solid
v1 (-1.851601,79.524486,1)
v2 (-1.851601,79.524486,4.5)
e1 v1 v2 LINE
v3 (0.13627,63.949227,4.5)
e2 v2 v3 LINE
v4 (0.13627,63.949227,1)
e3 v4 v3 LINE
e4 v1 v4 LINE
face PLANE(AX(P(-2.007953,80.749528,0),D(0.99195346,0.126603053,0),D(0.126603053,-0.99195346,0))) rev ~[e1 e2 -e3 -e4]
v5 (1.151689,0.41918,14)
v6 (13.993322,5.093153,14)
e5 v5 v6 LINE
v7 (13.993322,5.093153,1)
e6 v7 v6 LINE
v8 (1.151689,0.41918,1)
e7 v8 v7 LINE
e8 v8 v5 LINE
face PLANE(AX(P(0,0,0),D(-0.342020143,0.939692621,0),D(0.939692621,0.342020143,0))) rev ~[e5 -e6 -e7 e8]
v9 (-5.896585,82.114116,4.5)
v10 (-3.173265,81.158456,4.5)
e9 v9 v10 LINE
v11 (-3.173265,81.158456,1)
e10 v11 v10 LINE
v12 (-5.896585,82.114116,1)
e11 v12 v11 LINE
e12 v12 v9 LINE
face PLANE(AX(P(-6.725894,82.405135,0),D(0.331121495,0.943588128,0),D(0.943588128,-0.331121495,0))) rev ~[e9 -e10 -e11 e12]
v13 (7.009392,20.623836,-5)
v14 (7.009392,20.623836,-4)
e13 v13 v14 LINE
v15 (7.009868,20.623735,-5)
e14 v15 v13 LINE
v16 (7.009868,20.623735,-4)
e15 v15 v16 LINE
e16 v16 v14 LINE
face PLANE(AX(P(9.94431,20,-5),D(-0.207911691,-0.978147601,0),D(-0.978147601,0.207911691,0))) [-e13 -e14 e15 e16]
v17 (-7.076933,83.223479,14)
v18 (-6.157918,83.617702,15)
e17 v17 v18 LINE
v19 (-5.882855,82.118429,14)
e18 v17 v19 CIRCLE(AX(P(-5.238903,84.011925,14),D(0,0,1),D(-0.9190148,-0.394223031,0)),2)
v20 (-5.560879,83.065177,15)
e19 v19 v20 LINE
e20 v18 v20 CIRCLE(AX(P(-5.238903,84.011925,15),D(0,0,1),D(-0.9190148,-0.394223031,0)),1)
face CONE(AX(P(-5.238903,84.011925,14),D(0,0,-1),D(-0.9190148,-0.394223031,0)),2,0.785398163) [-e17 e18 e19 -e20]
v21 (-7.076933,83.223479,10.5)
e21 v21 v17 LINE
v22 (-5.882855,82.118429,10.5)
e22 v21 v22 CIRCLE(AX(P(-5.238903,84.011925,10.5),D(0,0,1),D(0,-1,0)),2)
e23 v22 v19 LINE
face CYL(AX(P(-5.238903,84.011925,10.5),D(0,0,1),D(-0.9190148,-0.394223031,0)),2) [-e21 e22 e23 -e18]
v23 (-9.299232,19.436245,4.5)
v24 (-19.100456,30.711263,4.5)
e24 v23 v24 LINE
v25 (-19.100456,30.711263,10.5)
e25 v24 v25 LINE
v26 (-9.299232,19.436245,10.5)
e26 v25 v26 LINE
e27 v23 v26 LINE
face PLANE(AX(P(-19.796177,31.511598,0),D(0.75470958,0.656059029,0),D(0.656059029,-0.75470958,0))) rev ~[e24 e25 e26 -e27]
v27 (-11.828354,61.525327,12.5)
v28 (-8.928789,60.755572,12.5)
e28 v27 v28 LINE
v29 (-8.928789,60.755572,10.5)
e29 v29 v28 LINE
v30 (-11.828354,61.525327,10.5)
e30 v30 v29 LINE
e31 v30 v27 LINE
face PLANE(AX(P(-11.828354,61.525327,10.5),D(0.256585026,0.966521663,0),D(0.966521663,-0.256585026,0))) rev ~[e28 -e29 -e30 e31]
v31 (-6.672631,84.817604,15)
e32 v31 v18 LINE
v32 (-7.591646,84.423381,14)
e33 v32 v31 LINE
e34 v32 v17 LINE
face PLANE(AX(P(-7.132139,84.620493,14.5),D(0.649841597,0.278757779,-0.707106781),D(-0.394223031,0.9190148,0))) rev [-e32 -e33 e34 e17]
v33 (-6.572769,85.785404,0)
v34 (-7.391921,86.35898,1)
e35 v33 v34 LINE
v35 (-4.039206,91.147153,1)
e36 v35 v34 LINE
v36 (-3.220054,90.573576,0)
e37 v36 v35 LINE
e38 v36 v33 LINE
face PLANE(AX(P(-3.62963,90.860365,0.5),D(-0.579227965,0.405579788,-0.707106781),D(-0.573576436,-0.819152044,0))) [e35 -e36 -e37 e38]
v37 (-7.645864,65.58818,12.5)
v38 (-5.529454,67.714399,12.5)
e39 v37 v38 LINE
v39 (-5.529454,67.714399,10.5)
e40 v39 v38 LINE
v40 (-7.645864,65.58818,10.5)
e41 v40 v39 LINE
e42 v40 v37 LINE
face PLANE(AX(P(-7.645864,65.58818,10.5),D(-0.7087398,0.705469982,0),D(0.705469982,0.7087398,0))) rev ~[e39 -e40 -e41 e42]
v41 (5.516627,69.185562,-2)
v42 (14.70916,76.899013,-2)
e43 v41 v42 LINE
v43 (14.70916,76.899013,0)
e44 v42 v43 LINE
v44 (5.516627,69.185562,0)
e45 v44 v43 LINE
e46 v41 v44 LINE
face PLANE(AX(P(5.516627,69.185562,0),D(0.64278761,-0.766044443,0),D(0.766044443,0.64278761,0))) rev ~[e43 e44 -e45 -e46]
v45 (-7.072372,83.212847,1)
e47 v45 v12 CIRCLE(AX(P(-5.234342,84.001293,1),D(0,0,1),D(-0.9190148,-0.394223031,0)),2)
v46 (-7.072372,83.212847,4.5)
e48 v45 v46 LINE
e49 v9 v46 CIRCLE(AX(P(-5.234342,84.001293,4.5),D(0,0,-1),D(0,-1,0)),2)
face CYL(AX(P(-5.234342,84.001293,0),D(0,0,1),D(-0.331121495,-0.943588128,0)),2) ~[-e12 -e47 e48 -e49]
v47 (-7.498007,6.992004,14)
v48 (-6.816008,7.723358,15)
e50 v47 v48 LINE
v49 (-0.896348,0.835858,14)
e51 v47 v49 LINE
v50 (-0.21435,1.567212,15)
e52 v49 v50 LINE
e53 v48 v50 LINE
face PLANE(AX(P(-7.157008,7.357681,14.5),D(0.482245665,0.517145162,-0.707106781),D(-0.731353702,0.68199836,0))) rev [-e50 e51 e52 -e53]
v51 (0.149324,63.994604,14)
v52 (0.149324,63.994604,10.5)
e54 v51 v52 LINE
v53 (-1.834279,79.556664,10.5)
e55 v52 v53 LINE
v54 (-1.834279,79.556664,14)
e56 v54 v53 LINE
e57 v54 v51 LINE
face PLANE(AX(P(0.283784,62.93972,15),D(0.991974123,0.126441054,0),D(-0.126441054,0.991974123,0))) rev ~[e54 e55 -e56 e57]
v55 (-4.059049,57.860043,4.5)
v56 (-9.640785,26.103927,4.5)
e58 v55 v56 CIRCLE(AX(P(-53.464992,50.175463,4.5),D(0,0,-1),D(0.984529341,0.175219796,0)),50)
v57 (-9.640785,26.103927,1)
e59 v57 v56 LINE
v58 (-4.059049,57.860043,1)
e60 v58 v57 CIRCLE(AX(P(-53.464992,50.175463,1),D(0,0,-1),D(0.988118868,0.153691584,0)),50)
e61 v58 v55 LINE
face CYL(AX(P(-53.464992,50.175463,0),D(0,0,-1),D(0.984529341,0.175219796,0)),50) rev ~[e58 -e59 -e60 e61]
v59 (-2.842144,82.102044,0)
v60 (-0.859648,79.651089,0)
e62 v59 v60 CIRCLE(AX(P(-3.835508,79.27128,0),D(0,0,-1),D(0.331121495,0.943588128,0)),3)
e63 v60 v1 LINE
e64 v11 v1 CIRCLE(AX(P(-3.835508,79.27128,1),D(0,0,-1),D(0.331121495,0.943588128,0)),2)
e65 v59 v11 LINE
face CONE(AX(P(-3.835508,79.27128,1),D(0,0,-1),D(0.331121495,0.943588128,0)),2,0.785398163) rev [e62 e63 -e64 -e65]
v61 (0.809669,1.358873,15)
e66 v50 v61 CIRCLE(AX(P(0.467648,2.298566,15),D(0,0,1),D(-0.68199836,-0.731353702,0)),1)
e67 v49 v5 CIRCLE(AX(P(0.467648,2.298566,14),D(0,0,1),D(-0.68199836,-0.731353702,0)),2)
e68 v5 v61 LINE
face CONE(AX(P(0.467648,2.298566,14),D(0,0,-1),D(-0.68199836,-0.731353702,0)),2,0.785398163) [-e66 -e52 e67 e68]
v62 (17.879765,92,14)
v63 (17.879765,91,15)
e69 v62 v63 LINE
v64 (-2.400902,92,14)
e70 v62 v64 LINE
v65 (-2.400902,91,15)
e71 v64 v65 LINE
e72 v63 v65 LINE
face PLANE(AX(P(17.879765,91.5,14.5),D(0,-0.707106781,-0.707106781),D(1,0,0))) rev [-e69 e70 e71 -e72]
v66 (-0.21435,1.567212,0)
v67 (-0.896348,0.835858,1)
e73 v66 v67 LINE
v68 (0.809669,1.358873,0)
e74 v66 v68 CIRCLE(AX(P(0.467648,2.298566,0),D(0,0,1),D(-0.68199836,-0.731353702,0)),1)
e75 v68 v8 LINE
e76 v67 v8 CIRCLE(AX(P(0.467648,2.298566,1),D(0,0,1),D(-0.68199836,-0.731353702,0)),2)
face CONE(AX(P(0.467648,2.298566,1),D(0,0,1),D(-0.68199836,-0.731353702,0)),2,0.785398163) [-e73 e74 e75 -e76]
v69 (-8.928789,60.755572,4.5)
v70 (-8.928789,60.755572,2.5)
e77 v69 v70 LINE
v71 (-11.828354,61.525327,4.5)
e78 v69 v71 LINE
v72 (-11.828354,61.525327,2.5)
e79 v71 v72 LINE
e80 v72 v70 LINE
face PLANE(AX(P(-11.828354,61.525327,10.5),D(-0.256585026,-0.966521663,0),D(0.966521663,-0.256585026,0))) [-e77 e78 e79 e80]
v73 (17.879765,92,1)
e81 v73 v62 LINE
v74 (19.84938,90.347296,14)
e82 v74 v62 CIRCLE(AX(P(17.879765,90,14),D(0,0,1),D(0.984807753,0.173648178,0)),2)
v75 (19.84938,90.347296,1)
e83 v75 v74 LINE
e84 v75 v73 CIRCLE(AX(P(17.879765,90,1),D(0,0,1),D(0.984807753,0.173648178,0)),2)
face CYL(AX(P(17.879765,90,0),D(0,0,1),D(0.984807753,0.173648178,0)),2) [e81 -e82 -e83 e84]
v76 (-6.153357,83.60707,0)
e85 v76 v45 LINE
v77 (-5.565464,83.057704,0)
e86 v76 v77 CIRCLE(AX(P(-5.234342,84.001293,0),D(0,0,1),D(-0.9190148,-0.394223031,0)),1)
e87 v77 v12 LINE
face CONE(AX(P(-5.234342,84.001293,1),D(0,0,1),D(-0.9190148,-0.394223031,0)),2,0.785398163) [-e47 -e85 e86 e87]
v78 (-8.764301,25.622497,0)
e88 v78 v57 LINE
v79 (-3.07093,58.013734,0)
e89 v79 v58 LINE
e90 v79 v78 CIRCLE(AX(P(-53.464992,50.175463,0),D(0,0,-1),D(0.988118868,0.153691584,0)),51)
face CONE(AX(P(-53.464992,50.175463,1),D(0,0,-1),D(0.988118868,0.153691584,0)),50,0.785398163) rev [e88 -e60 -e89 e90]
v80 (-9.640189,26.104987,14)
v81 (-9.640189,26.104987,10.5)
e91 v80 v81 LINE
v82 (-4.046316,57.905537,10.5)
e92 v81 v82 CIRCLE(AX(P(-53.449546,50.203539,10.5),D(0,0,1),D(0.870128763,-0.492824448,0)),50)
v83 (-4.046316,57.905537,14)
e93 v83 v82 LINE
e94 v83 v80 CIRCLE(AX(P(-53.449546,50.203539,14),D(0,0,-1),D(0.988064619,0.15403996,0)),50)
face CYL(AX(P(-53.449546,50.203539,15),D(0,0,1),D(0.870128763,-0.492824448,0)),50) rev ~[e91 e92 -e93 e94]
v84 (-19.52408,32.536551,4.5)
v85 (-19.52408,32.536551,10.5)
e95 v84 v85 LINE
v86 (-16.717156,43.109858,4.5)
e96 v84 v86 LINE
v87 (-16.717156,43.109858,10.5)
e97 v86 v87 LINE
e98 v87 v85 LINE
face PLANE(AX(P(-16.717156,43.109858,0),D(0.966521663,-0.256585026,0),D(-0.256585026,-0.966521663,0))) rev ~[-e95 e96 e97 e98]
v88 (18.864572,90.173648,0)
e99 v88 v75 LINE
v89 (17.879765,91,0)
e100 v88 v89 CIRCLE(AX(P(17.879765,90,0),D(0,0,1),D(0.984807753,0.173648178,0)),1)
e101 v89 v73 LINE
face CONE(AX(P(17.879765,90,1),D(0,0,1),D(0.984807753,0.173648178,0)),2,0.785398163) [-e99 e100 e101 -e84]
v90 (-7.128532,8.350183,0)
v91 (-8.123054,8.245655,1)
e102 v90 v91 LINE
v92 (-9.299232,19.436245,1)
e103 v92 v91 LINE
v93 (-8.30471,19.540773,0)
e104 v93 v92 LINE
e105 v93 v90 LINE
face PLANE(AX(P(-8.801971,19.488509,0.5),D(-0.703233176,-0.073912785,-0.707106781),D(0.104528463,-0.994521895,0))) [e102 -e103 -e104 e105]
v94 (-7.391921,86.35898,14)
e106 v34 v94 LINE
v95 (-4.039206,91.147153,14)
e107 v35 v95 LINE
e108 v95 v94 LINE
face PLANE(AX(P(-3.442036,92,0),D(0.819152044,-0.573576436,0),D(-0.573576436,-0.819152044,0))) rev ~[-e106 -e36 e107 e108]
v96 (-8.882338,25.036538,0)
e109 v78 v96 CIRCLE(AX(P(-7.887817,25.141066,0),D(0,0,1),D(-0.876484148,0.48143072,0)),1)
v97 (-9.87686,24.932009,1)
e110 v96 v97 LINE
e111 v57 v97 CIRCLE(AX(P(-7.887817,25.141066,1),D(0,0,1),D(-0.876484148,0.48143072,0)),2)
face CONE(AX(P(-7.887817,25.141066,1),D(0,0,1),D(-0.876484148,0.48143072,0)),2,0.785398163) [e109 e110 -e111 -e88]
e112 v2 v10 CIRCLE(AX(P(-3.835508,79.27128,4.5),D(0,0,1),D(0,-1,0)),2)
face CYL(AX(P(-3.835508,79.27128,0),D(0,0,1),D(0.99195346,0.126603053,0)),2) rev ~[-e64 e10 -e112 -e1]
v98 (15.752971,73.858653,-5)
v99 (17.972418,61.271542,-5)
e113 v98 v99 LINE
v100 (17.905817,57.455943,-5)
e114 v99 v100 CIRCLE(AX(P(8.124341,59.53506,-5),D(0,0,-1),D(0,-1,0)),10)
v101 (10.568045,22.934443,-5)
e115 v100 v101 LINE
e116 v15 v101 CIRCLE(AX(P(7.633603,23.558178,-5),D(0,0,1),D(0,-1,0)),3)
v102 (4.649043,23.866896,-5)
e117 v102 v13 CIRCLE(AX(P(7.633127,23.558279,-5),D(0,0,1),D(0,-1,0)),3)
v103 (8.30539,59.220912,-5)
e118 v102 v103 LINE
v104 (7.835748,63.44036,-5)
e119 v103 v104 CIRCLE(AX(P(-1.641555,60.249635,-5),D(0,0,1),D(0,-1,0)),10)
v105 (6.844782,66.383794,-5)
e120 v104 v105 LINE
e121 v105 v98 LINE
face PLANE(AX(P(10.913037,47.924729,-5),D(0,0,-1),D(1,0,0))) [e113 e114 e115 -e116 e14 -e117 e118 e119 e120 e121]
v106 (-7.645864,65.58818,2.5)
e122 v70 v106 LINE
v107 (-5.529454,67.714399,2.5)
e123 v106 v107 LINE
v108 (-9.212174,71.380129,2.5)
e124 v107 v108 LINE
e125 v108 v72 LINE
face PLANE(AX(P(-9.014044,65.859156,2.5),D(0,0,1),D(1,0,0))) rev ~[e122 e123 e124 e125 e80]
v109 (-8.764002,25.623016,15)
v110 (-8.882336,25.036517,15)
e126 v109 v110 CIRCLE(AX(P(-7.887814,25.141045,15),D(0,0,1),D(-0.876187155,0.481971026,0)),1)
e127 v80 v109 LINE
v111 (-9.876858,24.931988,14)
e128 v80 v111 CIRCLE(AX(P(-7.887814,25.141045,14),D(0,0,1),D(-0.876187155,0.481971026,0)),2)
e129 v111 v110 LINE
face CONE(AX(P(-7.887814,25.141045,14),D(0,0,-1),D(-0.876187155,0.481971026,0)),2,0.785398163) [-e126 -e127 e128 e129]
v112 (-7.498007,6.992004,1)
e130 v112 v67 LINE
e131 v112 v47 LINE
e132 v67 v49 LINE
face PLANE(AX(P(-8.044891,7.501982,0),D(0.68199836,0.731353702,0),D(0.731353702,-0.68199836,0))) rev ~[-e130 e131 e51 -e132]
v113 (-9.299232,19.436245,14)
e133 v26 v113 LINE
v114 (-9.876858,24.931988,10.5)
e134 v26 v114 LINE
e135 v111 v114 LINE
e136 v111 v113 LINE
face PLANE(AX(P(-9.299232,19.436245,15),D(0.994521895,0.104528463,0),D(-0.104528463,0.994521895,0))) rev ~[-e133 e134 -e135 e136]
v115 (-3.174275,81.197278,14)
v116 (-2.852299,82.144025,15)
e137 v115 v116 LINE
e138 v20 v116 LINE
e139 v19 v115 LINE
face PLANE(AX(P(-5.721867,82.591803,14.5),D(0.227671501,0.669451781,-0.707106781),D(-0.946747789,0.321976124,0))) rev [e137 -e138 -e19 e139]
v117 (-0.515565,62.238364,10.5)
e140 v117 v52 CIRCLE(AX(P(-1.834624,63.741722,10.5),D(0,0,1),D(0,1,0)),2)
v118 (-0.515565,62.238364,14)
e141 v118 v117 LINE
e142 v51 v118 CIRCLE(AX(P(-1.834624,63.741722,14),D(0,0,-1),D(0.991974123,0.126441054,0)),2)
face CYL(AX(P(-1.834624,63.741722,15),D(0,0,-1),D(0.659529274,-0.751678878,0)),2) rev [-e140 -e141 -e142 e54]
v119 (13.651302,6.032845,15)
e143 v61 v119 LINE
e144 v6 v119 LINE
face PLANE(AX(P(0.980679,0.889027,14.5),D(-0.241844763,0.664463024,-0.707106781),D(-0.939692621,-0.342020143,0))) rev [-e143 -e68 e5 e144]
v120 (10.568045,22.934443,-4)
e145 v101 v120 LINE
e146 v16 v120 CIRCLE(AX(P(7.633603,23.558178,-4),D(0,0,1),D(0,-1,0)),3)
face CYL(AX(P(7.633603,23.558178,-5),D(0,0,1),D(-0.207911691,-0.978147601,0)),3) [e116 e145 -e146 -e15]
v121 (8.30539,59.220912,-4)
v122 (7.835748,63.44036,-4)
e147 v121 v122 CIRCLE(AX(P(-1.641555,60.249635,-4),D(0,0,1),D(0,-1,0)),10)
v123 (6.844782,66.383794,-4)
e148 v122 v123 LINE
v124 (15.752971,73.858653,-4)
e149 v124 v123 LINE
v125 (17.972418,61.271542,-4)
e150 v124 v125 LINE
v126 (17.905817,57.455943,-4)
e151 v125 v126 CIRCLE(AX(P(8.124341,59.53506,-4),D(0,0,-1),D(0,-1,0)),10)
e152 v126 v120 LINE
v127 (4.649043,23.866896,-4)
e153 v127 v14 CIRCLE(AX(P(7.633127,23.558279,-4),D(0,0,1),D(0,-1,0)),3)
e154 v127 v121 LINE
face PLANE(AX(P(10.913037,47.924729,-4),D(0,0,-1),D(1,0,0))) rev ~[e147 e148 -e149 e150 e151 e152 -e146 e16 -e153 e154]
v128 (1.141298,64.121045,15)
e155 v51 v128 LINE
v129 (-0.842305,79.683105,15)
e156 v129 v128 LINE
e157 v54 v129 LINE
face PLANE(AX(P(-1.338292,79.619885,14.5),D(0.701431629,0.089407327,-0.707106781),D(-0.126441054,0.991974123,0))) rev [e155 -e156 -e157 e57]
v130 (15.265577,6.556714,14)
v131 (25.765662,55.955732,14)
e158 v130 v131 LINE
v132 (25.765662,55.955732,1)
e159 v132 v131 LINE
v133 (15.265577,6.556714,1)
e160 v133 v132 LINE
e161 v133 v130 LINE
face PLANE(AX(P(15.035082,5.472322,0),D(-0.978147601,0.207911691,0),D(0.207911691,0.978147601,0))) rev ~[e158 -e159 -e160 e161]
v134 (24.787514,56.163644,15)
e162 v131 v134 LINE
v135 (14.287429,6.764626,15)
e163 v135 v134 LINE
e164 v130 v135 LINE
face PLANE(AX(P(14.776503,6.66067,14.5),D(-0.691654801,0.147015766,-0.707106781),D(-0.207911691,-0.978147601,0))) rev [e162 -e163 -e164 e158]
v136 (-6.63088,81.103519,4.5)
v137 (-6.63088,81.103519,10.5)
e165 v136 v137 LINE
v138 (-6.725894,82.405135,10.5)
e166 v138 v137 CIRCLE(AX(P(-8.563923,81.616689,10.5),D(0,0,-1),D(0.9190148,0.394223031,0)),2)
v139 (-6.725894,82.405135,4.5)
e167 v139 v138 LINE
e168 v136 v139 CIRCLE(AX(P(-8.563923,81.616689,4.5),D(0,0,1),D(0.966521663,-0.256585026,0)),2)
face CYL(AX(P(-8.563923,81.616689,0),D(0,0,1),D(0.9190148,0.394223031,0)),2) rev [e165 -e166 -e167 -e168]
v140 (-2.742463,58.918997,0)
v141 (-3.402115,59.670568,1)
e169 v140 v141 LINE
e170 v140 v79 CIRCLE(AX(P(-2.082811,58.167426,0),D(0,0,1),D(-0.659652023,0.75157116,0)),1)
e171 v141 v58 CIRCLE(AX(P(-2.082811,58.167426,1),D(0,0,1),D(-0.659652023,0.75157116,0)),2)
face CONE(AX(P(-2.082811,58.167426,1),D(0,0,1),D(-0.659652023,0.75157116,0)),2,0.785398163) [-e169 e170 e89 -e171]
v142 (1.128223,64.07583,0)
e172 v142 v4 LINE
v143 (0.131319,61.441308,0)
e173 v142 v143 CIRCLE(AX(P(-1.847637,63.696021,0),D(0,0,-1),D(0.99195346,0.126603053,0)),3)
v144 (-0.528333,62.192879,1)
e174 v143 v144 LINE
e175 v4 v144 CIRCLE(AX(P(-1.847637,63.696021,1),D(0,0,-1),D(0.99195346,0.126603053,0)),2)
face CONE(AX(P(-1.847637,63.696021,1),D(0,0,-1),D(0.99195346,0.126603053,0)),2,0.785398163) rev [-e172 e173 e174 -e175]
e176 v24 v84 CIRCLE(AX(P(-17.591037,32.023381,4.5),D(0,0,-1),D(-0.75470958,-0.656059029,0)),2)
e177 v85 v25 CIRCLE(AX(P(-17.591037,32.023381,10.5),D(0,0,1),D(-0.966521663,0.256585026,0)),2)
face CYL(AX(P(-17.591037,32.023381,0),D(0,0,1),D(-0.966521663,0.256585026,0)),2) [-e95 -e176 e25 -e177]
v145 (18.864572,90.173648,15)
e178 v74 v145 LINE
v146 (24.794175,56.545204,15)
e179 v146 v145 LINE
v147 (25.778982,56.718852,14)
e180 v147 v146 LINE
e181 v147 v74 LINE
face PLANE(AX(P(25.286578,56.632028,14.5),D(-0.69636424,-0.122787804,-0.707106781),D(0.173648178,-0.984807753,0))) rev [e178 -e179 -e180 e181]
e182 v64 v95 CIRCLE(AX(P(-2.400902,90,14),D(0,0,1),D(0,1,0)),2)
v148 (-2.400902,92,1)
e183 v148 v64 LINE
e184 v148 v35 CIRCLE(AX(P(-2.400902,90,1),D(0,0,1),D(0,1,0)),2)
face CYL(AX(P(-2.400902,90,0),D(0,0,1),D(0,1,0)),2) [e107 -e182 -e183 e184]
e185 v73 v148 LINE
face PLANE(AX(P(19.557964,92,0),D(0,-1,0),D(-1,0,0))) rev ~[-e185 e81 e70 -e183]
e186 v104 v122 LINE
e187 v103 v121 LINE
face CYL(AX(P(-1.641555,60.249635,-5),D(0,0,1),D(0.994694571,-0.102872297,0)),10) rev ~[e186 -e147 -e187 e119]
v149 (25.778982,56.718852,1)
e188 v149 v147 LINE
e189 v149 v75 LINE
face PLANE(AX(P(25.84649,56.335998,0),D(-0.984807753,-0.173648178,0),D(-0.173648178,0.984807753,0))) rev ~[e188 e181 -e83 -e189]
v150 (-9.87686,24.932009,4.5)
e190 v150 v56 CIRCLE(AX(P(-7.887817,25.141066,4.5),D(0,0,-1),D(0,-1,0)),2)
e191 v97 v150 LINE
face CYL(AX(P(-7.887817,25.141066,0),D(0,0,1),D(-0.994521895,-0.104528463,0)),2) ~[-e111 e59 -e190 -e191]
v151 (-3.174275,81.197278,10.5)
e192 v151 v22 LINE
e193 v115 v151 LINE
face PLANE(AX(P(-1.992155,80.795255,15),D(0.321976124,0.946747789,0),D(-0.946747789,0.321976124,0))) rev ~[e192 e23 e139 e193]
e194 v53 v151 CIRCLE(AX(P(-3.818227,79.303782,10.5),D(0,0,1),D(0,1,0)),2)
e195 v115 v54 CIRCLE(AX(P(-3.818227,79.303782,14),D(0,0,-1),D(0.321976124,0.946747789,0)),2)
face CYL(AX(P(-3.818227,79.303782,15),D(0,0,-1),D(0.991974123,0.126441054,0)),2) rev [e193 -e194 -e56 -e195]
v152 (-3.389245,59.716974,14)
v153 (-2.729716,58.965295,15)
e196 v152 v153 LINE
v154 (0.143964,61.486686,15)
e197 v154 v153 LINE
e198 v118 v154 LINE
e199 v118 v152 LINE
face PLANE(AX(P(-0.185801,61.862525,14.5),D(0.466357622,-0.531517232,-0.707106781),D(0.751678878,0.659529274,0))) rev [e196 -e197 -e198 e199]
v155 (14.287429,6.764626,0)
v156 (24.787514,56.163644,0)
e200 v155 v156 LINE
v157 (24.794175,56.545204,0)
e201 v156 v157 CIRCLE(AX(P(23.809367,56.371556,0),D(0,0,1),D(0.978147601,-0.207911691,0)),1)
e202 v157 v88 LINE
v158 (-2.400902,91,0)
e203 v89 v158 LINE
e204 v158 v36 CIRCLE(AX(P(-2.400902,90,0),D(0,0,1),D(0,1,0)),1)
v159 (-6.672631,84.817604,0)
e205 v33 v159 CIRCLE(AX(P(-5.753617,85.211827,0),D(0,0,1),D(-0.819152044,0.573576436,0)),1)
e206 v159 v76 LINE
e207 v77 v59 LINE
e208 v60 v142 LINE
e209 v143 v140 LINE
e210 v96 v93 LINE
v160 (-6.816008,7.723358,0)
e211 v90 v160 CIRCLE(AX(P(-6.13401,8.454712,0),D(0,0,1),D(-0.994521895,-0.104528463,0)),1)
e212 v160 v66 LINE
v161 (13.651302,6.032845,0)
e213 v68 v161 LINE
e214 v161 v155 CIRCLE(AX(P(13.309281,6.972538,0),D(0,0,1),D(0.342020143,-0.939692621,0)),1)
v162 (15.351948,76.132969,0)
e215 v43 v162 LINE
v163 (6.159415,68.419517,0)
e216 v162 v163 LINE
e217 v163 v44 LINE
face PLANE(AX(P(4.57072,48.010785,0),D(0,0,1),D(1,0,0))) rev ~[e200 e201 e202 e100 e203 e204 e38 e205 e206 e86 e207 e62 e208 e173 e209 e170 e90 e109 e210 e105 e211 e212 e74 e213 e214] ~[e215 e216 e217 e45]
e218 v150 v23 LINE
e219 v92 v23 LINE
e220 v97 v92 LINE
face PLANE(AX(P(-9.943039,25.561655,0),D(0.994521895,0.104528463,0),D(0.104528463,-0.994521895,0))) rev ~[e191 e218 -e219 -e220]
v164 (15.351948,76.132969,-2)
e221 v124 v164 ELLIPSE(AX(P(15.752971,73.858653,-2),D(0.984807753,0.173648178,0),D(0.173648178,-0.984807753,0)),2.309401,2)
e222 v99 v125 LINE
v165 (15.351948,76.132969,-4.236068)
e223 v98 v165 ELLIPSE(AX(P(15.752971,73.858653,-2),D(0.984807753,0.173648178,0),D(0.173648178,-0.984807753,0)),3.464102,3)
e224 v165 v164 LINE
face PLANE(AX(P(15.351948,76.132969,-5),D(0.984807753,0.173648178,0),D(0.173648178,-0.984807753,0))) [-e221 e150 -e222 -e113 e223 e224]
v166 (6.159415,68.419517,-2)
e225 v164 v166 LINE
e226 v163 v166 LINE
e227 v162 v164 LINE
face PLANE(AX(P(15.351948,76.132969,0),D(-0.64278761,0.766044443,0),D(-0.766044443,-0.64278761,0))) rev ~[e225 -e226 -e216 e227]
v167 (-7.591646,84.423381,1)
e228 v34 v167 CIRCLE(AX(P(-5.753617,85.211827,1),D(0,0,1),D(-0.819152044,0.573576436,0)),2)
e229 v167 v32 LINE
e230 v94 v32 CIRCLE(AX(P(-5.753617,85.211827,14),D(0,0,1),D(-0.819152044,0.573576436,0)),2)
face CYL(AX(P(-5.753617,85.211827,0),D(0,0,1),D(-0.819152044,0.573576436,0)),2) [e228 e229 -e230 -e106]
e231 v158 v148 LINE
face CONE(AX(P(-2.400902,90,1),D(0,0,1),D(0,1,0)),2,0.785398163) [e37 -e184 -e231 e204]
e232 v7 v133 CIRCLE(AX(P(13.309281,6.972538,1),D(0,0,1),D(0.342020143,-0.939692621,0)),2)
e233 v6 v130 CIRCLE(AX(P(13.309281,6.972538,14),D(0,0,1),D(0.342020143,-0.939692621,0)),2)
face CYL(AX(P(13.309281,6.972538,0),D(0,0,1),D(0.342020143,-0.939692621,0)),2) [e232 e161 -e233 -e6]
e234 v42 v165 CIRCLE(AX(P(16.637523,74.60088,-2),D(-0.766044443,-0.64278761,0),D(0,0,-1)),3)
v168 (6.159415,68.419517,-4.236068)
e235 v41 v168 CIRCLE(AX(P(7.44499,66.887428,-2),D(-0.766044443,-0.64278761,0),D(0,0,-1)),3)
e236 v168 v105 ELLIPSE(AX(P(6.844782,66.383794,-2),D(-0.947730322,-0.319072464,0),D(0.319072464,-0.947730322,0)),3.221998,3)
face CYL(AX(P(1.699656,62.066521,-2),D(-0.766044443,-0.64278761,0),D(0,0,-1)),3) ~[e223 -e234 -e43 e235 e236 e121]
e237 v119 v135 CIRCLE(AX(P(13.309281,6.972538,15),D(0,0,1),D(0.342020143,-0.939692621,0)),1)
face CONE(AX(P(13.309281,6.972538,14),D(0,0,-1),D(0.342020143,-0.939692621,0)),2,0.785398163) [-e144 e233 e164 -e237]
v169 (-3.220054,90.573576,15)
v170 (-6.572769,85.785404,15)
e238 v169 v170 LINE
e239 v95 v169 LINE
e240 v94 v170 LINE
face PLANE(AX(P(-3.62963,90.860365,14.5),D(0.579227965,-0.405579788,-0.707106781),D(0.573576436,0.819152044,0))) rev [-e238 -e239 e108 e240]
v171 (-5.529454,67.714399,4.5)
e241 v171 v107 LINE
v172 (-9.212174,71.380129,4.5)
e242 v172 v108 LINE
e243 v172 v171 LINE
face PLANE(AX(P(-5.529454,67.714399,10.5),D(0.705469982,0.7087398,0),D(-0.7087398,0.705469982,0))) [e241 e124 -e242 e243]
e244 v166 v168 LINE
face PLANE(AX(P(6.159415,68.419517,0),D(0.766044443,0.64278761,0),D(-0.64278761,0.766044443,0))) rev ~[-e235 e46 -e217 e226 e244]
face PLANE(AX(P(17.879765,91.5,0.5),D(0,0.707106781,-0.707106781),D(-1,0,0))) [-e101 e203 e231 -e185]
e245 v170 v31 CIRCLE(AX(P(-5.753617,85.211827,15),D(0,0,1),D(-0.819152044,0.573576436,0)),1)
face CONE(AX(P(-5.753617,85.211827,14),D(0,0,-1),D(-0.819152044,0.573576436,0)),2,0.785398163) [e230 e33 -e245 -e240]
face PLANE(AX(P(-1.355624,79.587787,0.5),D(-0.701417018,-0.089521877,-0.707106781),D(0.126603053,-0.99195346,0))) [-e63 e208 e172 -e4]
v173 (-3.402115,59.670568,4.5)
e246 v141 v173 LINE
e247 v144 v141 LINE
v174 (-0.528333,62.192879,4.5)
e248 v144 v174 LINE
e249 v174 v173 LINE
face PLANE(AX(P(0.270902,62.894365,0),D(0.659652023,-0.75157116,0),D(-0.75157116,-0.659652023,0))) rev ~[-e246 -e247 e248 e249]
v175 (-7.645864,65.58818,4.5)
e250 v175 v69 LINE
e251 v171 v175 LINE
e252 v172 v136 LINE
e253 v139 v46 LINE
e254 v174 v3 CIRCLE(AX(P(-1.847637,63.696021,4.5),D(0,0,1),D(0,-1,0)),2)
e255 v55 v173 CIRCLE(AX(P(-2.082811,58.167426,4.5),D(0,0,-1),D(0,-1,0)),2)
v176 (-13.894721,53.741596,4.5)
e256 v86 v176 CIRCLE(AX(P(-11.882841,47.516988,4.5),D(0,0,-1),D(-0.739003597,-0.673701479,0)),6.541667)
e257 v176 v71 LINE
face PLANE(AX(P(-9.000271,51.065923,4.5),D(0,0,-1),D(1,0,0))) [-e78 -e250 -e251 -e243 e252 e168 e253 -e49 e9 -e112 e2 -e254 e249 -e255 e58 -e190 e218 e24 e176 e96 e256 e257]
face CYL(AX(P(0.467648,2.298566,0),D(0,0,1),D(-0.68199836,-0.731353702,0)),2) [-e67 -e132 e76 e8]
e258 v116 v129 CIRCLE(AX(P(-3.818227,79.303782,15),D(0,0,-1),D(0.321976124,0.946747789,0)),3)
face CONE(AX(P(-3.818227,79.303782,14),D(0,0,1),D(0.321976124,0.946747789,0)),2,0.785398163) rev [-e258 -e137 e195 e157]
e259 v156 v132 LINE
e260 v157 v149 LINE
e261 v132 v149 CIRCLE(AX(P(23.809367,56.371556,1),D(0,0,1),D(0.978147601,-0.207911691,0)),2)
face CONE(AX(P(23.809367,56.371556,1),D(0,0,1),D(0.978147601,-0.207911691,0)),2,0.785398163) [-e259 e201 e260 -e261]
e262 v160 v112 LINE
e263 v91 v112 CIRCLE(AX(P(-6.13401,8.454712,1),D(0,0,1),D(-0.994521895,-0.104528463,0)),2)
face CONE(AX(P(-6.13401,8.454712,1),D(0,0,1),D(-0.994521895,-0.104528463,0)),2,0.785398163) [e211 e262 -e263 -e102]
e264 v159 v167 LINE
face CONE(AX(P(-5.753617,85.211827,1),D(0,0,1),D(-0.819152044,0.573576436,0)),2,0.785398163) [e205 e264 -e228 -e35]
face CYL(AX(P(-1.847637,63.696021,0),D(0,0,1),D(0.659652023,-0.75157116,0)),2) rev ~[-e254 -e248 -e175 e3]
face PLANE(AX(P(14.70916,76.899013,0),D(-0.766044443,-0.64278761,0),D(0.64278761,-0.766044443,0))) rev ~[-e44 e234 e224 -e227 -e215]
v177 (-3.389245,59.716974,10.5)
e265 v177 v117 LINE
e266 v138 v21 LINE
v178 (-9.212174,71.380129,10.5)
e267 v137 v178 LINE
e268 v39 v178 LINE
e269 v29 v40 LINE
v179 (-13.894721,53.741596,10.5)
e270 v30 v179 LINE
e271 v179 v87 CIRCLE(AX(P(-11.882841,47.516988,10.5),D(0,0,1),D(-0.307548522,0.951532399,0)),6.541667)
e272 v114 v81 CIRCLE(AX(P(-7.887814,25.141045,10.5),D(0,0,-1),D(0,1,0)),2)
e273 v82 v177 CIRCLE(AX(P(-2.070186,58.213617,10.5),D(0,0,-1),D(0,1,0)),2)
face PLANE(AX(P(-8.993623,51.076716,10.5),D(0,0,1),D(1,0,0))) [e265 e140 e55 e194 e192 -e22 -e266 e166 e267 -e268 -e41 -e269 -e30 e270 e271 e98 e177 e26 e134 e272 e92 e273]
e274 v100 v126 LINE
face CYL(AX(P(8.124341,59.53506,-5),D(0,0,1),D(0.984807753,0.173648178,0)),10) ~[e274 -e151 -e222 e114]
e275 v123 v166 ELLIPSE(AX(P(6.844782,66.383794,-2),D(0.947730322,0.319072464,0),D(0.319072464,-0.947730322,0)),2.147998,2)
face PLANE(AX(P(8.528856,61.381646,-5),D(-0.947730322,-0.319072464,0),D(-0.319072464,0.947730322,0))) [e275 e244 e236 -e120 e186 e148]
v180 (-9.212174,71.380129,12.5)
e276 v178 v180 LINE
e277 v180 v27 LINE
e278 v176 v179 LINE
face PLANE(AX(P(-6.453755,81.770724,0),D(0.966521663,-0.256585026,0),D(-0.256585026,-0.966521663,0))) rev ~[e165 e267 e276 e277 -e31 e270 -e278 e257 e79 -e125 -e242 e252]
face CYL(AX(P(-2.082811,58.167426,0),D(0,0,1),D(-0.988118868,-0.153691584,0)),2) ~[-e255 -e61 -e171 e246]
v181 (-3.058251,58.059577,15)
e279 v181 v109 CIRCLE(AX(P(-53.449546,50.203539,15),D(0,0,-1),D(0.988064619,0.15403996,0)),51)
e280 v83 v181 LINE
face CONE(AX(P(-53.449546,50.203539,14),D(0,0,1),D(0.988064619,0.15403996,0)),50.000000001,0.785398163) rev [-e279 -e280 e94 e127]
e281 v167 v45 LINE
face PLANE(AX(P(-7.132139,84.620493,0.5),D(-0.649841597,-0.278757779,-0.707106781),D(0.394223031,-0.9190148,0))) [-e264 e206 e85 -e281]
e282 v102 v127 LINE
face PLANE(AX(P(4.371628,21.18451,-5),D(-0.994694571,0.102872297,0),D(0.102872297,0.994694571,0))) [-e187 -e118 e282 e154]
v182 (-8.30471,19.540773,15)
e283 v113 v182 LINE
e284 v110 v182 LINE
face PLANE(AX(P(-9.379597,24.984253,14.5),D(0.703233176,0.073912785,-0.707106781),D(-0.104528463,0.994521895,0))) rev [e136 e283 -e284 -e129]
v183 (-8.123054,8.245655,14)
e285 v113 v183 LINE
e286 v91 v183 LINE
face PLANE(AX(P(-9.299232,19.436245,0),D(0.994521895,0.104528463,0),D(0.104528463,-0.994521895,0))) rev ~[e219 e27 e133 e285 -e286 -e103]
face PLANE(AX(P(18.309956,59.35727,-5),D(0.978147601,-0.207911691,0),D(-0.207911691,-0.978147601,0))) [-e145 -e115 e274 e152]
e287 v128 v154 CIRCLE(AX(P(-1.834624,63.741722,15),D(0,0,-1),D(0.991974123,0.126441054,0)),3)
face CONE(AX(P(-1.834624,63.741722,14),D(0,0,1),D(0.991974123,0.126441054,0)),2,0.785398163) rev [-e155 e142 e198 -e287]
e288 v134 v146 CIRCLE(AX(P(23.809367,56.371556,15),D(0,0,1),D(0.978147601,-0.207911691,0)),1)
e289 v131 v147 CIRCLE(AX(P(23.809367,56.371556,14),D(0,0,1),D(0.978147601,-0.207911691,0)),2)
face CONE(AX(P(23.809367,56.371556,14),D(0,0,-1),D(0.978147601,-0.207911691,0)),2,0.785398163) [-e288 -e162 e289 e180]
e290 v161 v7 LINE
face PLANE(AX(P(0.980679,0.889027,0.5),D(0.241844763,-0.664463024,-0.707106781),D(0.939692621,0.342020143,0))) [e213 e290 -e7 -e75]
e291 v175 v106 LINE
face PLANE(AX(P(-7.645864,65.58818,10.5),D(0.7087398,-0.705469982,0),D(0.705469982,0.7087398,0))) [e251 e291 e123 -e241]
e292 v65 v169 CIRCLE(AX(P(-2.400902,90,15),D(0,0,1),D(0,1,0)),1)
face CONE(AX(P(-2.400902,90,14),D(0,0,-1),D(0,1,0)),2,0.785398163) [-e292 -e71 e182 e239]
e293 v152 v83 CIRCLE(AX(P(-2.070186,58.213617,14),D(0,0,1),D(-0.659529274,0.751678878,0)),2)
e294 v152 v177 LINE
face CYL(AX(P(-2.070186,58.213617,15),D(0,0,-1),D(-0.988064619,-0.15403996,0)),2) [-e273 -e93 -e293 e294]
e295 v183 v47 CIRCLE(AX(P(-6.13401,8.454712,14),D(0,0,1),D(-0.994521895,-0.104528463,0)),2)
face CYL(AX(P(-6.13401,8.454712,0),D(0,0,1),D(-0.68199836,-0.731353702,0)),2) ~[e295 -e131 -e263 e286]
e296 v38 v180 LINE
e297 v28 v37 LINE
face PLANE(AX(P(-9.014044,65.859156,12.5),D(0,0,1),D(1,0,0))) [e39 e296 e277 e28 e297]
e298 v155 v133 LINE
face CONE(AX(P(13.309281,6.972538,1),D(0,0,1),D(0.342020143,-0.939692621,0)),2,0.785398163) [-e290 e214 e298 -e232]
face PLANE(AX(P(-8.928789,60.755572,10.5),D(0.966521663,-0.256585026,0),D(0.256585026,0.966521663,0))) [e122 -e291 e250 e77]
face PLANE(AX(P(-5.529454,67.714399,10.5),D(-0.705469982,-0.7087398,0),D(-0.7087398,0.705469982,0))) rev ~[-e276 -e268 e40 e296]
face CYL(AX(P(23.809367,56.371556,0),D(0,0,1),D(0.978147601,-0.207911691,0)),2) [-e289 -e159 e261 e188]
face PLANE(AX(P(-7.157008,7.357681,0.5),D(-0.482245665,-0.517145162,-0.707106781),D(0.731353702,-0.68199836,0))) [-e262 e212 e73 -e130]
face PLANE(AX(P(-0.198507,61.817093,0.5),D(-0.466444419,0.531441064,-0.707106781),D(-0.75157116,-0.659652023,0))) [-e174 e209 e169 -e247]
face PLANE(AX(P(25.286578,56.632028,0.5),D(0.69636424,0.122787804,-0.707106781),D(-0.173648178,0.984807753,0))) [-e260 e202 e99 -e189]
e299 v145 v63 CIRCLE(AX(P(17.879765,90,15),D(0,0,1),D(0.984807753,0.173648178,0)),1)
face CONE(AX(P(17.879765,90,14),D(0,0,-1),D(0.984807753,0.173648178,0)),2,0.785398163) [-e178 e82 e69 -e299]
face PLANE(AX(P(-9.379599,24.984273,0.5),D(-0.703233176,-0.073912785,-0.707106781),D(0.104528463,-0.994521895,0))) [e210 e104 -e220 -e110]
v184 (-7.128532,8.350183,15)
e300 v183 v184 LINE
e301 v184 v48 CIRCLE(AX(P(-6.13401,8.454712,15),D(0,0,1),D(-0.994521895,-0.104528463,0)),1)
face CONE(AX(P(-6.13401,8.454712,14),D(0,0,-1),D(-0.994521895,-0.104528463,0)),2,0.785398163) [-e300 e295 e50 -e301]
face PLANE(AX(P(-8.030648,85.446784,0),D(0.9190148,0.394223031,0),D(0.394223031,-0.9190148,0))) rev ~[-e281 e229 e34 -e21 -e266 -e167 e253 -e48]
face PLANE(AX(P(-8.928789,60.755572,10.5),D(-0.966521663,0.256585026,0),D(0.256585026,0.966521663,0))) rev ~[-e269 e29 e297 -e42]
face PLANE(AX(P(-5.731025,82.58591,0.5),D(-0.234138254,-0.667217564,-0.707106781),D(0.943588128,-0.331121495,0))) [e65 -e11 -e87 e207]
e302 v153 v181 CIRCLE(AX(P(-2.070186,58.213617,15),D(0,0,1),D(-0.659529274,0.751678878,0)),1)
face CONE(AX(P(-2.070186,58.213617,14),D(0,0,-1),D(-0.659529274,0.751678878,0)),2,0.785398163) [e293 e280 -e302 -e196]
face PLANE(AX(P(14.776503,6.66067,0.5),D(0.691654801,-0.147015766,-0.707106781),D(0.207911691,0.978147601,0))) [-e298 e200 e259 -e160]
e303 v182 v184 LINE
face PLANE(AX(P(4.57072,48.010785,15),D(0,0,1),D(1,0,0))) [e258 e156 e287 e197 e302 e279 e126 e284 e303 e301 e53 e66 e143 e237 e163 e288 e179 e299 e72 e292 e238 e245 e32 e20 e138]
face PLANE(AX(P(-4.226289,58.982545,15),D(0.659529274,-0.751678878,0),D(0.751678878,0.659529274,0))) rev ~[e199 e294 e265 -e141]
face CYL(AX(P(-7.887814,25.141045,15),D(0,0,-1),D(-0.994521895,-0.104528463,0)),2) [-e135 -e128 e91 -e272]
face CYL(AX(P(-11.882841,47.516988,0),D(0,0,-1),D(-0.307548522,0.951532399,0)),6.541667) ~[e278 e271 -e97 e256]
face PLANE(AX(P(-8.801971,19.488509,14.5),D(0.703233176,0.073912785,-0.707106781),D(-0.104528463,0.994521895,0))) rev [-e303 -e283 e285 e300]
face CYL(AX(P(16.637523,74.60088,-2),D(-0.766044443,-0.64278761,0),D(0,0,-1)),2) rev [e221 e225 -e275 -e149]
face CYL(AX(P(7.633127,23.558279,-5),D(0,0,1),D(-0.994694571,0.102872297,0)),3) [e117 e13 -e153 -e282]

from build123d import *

# Parameters (mm, degrees)
F1_DEPTH       = 15
F2_R           = 2
F4_DEPTH       = 4.5
F6_DEPTH       = 4.5
F7_R           = 2
F8_SIZE        = 1
F10_DEPTH      = 2
F10_DEPTH_BACK = 8
F12_DEPTH      = 5
F14_DEPTH      = 1
F15_R          = 10
F16_R          = 3
F17_R          = 2
F18_T1_DEPTH   = 27


# Not quite as in the source:
# - a fillet or chamfer that OpenCascade refuses, or shapes differently, is made with other operations: its cross-section is extruded or revolved along the edge and cut away or added


with BuildPart() as f1:
    # F0 (on Top) → F1 (new body)
    with BuildSketch(Plane.XY):
        Polygon((-8.0448907178, 7.5019819607), (0, 0), (15.0350819326, 5.4723222932), (25.8464898551, 56.3359975314), (19.5579639798, 92), (-3.4420360202, 92), (-8.030647511, 85.4467836457), (-6.4537553867, 81.7707244475), (-13.8947211419, 53.7415962301), (-16.7171564284, 43.1098579407), (-19.7961767409, 31.5115979887), (-9.299232277, 19.4362447051), align=None)
        with BuildLine():
            ThreePointArc((-13.8947211419, 53.7415962301), (-18.2055037731, 49.1954821635), (-16.7171564284, 43.1098579407))
            Line((-16.7171564284, 43.1098579407), (-13.8947211419, 53.7415962301))
        make_face()
    extrude(amount=F1_DEPTH)

    # F2
    f2_edges = [f1.edges().sort_by_distance(p)[0] for p in [
        (-3.442036, 92, 7.5),
        (19.557964, 92, 7.5),
        (-8.030648, 85.446784, 7.5),
        (-6.453755, 81.770724, 7.5),
        (25.84649, 56.335998, 7.5),
        (15.035082, 5.472322, 7.5),
        (-19.796177, 31.511598, 7.5),
        (-8.044891, 7.501982, 7.5),
        (0, 0, 7.5),
    ]]
    fillet(f2_edges, radius=F2_R)

    # F3 (on face) → F4 (cut)
    with BuildSketch(Plane.XY.offset(15)):
        with BuildLine():
            Line((-19.1004557272, 30.7112625143), (-9.299232277, 19.4362447051))
            Line((-9.299232277, 19.4362447051), (-9.9431083431, 25.5623162612))
            ThreePointArc((-9.9431083431, 25.5623162612), (-4.1654007718, 41.7730592838), (-4.2262892289, 58.9825446545))
            Line((-4.2262892289, 58.9825446545), (0.2837840411, 62.9397203012))
            Line((0.2837840411, 62.9397203012), (-1.9921549357, 80.795254507))
            Line((-1.9921549357, 80.795254507), (-6.7258938789, 82.4051351292))
            ThreePointArc((-6.7258938789, 82.4051351292), (-6.5692308005, 81.7622951194), (-6.6308801526, 81.103519015))
            Line((-6.6308801526, 81.103519015), (-13.8947211419, 53.7415962301))
            ThreePointArc((-13.8947211419, 53.7415962301), (-18.2055037731, 49.1954821635), (-16.7171564284, 43.1098579407))
            Line((-16.7171564284, 43.1098579407), (-19.5240798921, 32.5365506243))
            ThreePointArc((-19.5240798921, 32.5365506243), (-19.539255282, 31.5712259114), (-19.1004557272, 30.7112625143))
        make_face()
    extrude(amount=-F4_DEPTH, mode=Mode.SUBTRACT)

    # F5 (on face) → F6 (cut)
    with BuildSketch(Plane(origin=(0, 0, 0), x_dir=(1, 0, 0), z_dir=(0, 0, -1))):
        with BuildLine():
            ThreePointArc((-6.6308801526, -81.103519015), (-6.5692308005, -81.7622951194), (-6.7258938789, -82.4051351292))
            Line((-6.7258938789, -82.4051351292), (-2.0079532375, -80.7495276563))
            Line((-2.0079532375, -80.7495276563), (0.2709017201, -62.8943653752))
            Line((0.2709017201, -62.8943653752), (-4.2385252382, -58.9364532352))
            ThreePointArc((-4.2385252382, -58.9364532352), (-4.1797341848, -41.7514896804), (-9.9430388376, -25.5616549609))
            Line((-9.9430388376, -25.5616549609), (-9.299232277, -19.4362447051))
            Line((-9.299232277, -19.4362447051), (-19.1004557272, -30.7112625143))
            ThreePointArc((-19.1004557272, -30.7112625143), (-19.539255282, -31.5712259114), (-19.5240798921, -32.5365506243))
            Line((-19.5240798921, -32.5365506243), (-16.7171564284, -43.1098579407))
            ThreePointArc((-16.7171564284, -43.1098579407), (-18.2055037731, -49.1954821635), (-13.8947211419, -53.7415962301))
            Line((-13.8947211419, -53.7415962301), (-6.6308801526, -81.103519015))
        make_face()
    extrude(amount=-F6_DEPTH, mode=Mode.SUBTRACT)

    # F7
    f7_edges = [f1.edges().sort_by_distance(p)[0] for p in [
        (-9.943108, 25.562316, 12.75),
        (-9.943039, 25.561655, 2.25),
        (-4.226289, 58.982545, 12.75),
        (0.283784, 62.93972, 12.75),
        (-4.238525, 58.936453, 2.25),
        (0.270902, 62.894365, 2.25),
        (-1.992155, 80.795255, 12.75),
        (-2.007953, 80.749528, 2.25),
        (-6.725894, 82.405135, 7.5),
        (-6.725894, 82.405135, 2.25),
        (-6.725894, 82.405135, 12.75),
    ]]
    fillet(f7_edges, radius=F7_R)

    # F8
    f8_edges = [f1.edges().sort_by_distance(p)[0] for p in [
        (-7.334289, 83.82343, 15),
        (-6.597337, 82.544049, 15),
        (-7.743054, 85.417108, 15),
        (-4.528565, 81.657853, 15),
        (-5.715563, 88.753067, 15),
        (-2.269238, 80.568943, 15),
        (-3.324399, 91.774022, 15),
        (-0.842477, 71.775634, 15),
        (7.739431, 92, 15),
        (0.035819, 63.033597, 15),
        (19.16534, 91.532089, 15),
        (-1.952405, 60.977669, 15),
        (22.814181, 73.533074, 15),
        (-3.950317, 58.895605, 15),
        (25.809062, 56.336651, 15),
        (-4.205609, 41.541288, 15),
        (20.515619, 31.256223, 15),
        (-9.848308, 25.536603, 15),
        (14.818701, 5.66042, 15),
        (-8.999956, 16.588822, 15),
        (7.572505, 2.756166, 15),
        (-7.923879, 7.562316, 15),
        (0.068913, 0.338716, 15),
        (-4.197178, 3.913931, 15),
        (-7.332009, 83.818114, 0),
        (-6.599862, 82.540006, 0),
        (-7.743054, 85.417108, 0),
        (-4.534925, 81.636286, 0),
        (-5.715563, 88.753067, 0),
        (-2.280519, 80.529059, 0),
        (-3.324399, 91.774022, 0),
        (-0.857666, 71.736857, 0),
        (7.739431, 92, 0),
        (0.022922, 62.988201, 0),
        (19.16534, 91.532089, 0),
        (-1.965224, 60.931724, 0),
        (22.814181, 73.533074, 0),
        (-3.962878, 58.849592, 0),
        (25.809062, 56.336651, 0),
        (-4.219912, 41.519712, 0),
        (20.515619, 31.256223, 0),
        (-9.848432, 25.536019, 0),
        (14.818701, 5.66042, 0),
        (-8.999957, 16.588832, 0),
        (7.572505, 2.756166, 0),
        (-7.923879, 7.562316, 0),
        (0.068913, 0.338716, 0),
        (-4.197178, 3.913931, 0),
    ]]
    chamfer(f8_edges, length=F8_SIZE)

    # F9 (on face) → F10 (join, two sides)
    with BuildSketch(Plane.XY.offset(10.5)) as f10_sk:
        Polygon((-9.2121738851, 71.3801288833), (-11.82835392, 61.5253266909), (-8.928788932, 60.7555716127), (-7.6458638018, 65.5881799261), (-5.5294538555, 67.7143993266), align=None)
    extrude(amount=F10_DEPTH)
    extrude(f10_sk.sketch, amount=-F10_DEPTH_BACK)

    # F11 (on face) → F12 (join)
    with BuildSketch(Plane(origin=(0, 0, 0), x_dir=(1, 0, 0), z_dir=(0, 0, -1))):
        Polygon((5.5166269788, -69.1855618273), (14.7091602962, -76.8990131435), (15.3519479059, -76.1329687004), (6.1594145885, -68.4195173842), align=None)
    extrude(amount=F12_DEPTH)

    # F13 (on face) → F14 (join)
    with BuildSketch(Plane(origin=(0, 0, -5), x_dir=(1, 0, 0), z_dir=(0, 0, -1))):
        Polygon((6.1594145885, -68.4195173842), (15.3519479059, -76.1329687004), (18.3099562872, -59.3572695449), (9.9443103961, -20), (4.371628125, -21.1845101828), (8.5288556293, -61.3816455007), align=None)
        Polygon((14.7091602962, -76.8990131435), (15.3519479059, -76.1329687004), (6.1594145885, -68.4195173842), (5.5166269788, -69.1855618273), align=None)
    extrude(amount=-F14_DEPTH)

    # F15
    f15_edges = [f1.edges().sort_by_distance(p)[0] for p in [
        (18.309956, 59.35727, -4.5),
        (8.528856, 61.381646, -4.5),
    ]]
    fillet(f15_edges, radius=F15_R)

    # F16
    f16_edges = [f1.edges().sort_by_distance(p)[0] for p in [
        (4.371628, 21.18451, -4.5),
        (9.94431, 20, -4.5),
    ]]
    fillet(f16_edges, radius=F16_R)

    # F17
    f17_edges = [f1.edges().sort_by_distance(p)[0] for p in [
        (10.755681, 72.276243, -4),
    ]]
    fillet(f17_edges, radius=F17_R)

    # F18: fillet of radius 3 on 1 edges, made by hand

    # F18_s2 → F18_t1 (cut)
    with BuildSketch(Plane(origin=(31.5591951189, 26.4813089845, 0), x_dir=(0, 0, 1), z_dir=(0.7660444431, 0.6427876097, 0))):
        with BuildLine():
            ThreePointArc((-5, -46.4531957126), (-4.1213203436, -48.5745160562), (-2, -49.4531957126))
            Line((-2, -49.4531957126), (-5, -49.4531957126))
            Line((-5, -49.4531957126), (-5, -46.4531957126))
        make_face()
    extrude(amount=F18_T1_DEPTH, mode=Mode.SUBTRACT)


solid = f1.part
